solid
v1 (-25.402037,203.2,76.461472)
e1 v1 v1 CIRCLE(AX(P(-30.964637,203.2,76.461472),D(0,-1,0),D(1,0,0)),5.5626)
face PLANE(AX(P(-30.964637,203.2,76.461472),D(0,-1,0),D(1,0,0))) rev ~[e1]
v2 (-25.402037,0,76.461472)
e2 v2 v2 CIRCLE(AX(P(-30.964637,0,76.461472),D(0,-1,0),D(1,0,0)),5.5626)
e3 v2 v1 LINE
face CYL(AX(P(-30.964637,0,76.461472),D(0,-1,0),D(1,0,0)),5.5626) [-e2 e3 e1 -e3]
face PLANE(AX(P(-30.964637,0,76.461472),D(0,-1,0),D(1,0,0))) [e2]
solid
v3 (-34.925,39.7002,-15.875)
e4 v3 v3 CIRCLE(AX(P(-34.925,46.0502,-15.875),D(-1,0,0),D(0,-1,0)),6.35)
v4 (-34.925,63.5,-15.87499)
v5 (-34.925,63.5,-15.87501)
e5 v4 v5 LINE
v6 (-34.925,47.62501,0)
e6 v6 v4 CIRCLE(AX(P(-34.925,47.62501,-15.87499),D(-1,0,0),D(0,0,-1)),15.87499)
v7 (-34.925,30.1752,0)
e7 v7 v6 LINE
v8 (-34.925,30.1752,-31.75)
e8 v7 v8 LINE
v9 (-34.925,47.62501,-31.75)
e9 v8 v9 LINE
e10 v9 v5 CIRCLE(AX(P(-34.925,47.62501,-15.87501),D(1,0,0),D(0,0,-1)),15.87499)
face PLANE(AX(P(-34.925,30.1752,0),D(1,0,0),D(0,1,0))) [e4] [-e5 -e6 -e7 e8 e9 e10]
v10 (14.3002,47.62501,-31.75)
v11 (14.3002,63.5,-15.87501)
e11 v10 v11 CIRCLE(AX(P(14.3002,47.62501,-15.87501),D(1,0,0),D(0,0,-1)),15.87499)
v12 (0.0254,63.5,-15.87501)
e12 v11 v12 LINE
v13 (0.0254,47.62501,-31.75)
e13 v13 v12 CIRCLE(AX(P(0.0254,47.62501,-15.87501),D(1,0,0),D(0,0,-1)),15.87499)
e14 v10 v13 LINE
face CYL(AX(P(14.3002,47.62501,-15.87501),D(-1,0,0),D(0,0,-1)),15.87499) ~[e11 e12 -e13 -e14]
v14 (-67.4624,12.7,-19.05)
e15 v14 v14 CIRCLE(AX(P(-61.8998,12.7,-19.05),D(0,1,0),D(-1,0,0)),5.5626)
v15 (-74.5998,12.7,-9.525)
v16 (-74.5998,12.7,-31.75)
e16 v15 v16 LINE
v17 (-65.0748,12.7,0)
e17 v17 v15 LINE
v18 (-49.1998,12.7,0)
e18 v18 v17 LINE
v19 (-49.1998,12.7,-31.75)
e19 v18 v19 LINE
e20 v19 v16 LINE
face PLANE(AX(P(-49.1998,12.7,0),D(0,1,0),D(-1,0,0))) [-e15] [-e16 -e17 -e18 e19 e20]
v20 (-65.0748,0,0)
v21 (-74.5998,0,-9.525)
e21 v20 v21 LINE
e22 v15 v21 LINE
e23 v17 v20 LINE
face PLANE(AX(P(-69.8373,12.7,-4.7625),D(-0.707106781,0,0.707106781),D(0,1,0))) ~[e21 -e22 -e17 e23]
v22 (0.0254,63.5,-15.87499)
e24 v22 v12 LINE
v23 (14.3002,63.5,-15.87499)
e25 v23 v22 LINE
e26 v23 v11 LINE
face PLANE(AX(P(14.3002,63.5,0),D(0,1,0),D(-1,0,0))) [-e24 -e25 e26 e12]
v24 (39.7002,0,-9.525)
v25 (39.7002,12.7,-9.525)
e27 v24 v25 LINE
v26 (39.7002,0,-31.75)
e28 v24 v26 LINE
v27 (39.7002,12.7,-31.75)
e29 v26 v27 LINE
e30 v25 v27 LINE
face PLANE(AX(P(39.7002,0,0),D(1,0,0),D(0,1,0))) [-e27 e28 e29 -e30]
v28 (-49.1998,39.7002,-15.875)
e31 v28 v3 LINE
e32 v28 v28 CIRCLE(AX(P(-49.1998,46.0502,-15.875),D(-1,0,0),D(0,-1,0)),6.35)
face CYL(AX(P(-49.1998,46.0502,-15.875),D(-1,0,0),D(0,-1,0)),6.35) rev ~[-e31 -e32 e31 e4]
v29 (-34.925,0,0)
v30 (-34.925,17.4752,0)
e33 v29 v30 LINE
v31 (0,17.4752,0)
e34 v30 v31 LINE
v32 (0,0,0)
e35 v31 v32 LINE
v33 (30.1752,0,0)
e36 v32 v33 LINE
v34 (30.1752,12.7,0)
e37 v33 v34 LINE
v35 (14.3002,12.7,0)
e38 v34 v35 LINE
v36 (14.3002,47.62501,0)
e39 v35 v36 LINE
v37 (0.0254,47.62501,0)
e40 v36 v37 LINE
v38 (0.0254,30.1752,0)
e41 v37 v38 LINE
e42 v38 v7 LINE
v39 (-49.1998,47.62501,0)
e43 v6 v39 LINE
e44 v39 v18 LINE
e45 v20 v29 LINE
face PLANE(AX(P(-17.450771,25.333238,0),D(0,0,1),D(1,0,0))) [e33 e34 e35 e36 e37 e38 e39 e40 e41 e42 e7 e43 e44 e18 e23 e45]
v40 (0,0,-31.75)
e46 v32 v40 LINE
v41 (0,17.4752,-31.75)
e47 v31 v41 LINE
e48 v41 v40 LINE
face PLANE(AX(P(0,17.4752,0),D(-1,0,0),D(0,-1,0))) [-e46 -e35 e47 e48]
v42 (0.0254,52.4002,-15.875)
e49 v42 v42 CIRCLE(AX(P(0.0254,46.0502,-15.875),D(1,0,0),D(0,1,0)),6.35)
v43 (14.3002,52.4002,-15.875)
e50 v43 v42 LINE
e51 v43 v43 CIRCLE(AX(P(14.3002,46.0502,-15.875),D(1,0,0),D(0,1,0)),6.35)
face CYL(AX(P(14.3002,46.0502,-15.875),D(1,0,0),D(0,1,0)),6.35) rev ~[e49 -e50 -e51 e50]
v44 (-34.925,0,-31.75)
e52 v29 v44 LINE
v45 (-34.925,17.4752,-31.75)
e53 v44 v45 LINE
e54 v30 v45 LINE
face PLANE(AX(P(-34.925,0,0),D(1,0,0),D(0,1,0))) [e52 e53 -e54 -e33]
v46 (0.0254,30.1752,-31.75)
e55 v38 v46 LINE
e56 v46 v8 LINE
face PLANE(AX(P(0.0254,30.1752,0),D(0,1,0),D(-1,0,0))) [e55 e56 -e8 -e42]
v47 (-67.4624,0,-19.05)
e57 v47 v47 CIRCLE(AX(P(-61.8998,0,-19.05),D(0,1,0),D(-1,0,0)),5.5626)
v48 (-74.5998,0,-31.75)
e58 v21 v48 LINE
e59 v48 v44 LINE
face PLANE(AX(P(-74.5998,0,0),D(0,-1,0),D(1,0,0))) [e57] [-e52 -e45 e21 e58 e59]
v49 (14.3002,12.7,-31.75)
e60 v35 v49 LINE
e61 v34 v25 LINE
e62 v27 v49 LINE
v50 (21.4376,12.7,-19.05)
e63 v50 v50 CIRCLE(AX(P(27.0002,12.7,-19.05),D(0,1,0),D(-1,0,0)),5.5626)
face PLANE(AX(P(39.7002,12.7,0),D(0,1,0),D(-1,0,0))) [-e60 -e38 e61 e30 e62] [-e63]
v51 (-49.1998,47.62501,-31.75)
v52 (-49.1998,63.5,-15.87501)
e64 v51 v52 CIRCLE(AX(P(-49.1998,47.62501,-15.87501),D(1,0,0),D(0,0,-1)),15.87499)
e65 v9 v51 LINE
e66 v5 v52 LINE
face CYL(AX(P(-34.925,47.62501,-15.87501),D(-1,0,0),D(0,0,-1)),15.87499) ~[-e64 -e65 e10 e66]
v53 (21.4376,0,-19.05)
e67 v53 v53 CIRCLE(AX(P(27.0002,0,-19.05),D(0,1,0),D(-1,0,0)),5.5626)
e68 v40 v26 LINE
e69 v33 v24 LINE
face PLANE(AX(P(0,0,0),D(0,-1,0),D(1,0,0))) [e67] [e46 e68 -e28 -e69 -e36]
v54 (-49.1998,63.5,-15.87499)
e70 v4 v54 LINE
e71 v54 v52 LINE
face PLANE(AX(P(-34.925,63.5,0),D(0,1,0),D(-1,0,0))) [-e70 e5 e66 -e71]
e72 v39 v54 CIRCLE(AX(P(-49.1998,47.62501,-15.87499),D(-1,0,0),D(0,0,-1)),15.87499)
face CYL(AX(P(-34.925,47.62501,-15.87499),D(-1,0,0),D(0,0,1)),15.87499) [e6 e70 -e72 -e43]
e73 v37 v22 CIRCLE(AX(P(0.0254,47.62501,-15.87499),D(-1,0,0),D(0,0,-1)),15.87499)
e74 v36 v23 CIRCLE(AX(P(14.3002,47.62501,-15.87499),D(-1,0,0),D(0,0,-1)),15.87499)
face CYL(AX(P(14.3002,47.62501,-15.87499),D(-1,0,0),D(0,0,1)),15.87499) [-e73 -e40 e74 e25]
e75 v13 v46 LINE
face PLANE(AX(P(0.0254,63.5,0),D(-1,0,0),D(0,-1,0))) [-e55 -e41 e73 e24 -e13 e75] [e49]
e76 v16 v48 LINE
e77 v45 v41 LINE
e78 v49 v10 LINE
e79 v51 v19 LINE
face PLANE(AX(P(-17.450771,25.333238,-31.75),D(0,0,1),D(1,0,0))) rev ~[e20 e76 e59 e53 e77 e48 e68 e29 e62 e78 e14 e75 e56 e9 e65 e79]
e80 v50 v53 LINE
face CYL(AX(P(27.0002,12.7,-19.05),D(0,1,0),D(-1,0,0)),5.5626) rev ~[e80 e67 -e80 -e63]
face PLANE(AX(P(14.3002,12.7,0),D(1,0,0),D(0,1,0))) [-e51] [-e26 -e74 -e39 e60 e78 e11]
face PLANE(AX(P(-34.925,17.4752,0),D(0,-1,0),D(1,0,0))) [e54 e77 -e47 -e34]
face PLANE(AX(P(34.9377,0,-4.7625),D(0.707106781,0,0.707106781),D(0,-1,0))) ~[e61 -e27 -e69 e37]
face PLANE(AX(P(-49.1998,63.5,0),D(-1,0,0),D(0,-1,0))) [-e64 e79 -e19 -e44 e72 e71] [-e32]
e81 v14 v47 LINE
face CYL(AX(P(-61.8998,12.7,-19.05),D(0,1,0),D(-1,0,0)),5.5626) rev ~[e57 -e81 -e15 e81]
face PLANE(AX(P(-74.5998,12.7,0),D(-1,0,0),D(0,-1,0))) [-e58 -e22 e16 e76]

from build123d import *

# Parameters (mm, degrees)
F1_DEPTH  = 31.75
F2_R      = 6.35
F3_DEPTH  = 25.4
F4_R      = 6.35
F5_DEPTH  = 25.4
F6_R      = 5.5626
F7_DEPTH  = 25.4
F8_SIZE   = 9.525
F9_R      = 15.87499
F10_R     = 5.5626
F11_DEPTH = 203.2


# Not quite as in the source:
# - a fillet or chamfer is up to 0.001 mm smaller than in the source, because OpenCascade refuses the exact size


with BuildPart() as f1:
    # F0 (on Top) → F1 (new body)
    with BuildSketch(Plane.XY):
        Polygon((0, 17.4752), (0, 0), (39.7002, 0), (39.7002, 12.7), (14.3002, 12.7), (14.3002, 63.5), (0.0254, 63.5), (0.0254, 30.1752), (-34.925, 30.1752), (-34.925, 63.5), (-49.1998, 63.5), (-49.1998, 12.7), (-74.5998, 12.7), (-74.5998, 0), (-34.925, 0), (-34.925, 17.4752), align=None)
    extrude(amount=-F1_DEPTH)

    # F2 (on face) → F3 (cut)
    with BuildSketch(Plane.YZ.offset(14.3002)):
        with Locations((46.0502, -15.875)):
            Circle(F2_R)
    extrude(amount=-F3_DEPTH, mode=Mode.SUBTRACT)

    # F4 (on face) → F5 (cut)
    with BuildSketch(Plane(origin=(-49.1998, 0, 0), x_dir=(0, -1, 0), z_dir=(-1, 0, 0))):
        with Locations((-46.0502, -15.875)):
            Circle(F4_R)
    extrude(amount=-F5_DEPTH, mode=Mode.SUBTRACT)

    # F6 (on face) → F7 (cut)
    with BuildSketch(Plane(origin=(0, 12.7, 0), x_dir=(-1, 0, 0), z_dir=(0, 1, 0))):
        with Locations((61.8998, -19.05)):
            Circle(F6_R)
        with Locations((-27.0002, -19.05)):
            Circle(F6_R)
    extrude(amount=-F7_DEPTH, mode=Mode.SUBTRACT)

    # F8
    f8_edges = [f1.edges().sort_by_distance(p)[0] for p in [
        (-74.5998, 6.35, 0),
        (39.7002, 6.35, 0),
    ]]
    chamfer(f8_edges, length=F8_SIZE)

    # F9 (radius 15.875 in the source; OpenCascade refuses exactly that, so slightly less here)
    f9_edges = [f1.edges().sort_by_distance(p)[0] for p in [
        (-42.0624, 63.5, 0),
        (-42.0624, 63.5, -31.75),
        (7.1628, 63.5, -31.75),
        (7.1628, 63.5, 0),
    ]]
    fillet(f9_edges, radius=F9_R)


with BuildPart() as f11:
    # F10 (on Front) → F11 (new body)
    with BuildSketch(Plane.XZ):
        with Locations((-30.9646371752, 76.4614716172)):
            Circle(F10_R)
    extrude(amount=-F11_DEPTH)


solid = Compound([f1.part, f11.part])
